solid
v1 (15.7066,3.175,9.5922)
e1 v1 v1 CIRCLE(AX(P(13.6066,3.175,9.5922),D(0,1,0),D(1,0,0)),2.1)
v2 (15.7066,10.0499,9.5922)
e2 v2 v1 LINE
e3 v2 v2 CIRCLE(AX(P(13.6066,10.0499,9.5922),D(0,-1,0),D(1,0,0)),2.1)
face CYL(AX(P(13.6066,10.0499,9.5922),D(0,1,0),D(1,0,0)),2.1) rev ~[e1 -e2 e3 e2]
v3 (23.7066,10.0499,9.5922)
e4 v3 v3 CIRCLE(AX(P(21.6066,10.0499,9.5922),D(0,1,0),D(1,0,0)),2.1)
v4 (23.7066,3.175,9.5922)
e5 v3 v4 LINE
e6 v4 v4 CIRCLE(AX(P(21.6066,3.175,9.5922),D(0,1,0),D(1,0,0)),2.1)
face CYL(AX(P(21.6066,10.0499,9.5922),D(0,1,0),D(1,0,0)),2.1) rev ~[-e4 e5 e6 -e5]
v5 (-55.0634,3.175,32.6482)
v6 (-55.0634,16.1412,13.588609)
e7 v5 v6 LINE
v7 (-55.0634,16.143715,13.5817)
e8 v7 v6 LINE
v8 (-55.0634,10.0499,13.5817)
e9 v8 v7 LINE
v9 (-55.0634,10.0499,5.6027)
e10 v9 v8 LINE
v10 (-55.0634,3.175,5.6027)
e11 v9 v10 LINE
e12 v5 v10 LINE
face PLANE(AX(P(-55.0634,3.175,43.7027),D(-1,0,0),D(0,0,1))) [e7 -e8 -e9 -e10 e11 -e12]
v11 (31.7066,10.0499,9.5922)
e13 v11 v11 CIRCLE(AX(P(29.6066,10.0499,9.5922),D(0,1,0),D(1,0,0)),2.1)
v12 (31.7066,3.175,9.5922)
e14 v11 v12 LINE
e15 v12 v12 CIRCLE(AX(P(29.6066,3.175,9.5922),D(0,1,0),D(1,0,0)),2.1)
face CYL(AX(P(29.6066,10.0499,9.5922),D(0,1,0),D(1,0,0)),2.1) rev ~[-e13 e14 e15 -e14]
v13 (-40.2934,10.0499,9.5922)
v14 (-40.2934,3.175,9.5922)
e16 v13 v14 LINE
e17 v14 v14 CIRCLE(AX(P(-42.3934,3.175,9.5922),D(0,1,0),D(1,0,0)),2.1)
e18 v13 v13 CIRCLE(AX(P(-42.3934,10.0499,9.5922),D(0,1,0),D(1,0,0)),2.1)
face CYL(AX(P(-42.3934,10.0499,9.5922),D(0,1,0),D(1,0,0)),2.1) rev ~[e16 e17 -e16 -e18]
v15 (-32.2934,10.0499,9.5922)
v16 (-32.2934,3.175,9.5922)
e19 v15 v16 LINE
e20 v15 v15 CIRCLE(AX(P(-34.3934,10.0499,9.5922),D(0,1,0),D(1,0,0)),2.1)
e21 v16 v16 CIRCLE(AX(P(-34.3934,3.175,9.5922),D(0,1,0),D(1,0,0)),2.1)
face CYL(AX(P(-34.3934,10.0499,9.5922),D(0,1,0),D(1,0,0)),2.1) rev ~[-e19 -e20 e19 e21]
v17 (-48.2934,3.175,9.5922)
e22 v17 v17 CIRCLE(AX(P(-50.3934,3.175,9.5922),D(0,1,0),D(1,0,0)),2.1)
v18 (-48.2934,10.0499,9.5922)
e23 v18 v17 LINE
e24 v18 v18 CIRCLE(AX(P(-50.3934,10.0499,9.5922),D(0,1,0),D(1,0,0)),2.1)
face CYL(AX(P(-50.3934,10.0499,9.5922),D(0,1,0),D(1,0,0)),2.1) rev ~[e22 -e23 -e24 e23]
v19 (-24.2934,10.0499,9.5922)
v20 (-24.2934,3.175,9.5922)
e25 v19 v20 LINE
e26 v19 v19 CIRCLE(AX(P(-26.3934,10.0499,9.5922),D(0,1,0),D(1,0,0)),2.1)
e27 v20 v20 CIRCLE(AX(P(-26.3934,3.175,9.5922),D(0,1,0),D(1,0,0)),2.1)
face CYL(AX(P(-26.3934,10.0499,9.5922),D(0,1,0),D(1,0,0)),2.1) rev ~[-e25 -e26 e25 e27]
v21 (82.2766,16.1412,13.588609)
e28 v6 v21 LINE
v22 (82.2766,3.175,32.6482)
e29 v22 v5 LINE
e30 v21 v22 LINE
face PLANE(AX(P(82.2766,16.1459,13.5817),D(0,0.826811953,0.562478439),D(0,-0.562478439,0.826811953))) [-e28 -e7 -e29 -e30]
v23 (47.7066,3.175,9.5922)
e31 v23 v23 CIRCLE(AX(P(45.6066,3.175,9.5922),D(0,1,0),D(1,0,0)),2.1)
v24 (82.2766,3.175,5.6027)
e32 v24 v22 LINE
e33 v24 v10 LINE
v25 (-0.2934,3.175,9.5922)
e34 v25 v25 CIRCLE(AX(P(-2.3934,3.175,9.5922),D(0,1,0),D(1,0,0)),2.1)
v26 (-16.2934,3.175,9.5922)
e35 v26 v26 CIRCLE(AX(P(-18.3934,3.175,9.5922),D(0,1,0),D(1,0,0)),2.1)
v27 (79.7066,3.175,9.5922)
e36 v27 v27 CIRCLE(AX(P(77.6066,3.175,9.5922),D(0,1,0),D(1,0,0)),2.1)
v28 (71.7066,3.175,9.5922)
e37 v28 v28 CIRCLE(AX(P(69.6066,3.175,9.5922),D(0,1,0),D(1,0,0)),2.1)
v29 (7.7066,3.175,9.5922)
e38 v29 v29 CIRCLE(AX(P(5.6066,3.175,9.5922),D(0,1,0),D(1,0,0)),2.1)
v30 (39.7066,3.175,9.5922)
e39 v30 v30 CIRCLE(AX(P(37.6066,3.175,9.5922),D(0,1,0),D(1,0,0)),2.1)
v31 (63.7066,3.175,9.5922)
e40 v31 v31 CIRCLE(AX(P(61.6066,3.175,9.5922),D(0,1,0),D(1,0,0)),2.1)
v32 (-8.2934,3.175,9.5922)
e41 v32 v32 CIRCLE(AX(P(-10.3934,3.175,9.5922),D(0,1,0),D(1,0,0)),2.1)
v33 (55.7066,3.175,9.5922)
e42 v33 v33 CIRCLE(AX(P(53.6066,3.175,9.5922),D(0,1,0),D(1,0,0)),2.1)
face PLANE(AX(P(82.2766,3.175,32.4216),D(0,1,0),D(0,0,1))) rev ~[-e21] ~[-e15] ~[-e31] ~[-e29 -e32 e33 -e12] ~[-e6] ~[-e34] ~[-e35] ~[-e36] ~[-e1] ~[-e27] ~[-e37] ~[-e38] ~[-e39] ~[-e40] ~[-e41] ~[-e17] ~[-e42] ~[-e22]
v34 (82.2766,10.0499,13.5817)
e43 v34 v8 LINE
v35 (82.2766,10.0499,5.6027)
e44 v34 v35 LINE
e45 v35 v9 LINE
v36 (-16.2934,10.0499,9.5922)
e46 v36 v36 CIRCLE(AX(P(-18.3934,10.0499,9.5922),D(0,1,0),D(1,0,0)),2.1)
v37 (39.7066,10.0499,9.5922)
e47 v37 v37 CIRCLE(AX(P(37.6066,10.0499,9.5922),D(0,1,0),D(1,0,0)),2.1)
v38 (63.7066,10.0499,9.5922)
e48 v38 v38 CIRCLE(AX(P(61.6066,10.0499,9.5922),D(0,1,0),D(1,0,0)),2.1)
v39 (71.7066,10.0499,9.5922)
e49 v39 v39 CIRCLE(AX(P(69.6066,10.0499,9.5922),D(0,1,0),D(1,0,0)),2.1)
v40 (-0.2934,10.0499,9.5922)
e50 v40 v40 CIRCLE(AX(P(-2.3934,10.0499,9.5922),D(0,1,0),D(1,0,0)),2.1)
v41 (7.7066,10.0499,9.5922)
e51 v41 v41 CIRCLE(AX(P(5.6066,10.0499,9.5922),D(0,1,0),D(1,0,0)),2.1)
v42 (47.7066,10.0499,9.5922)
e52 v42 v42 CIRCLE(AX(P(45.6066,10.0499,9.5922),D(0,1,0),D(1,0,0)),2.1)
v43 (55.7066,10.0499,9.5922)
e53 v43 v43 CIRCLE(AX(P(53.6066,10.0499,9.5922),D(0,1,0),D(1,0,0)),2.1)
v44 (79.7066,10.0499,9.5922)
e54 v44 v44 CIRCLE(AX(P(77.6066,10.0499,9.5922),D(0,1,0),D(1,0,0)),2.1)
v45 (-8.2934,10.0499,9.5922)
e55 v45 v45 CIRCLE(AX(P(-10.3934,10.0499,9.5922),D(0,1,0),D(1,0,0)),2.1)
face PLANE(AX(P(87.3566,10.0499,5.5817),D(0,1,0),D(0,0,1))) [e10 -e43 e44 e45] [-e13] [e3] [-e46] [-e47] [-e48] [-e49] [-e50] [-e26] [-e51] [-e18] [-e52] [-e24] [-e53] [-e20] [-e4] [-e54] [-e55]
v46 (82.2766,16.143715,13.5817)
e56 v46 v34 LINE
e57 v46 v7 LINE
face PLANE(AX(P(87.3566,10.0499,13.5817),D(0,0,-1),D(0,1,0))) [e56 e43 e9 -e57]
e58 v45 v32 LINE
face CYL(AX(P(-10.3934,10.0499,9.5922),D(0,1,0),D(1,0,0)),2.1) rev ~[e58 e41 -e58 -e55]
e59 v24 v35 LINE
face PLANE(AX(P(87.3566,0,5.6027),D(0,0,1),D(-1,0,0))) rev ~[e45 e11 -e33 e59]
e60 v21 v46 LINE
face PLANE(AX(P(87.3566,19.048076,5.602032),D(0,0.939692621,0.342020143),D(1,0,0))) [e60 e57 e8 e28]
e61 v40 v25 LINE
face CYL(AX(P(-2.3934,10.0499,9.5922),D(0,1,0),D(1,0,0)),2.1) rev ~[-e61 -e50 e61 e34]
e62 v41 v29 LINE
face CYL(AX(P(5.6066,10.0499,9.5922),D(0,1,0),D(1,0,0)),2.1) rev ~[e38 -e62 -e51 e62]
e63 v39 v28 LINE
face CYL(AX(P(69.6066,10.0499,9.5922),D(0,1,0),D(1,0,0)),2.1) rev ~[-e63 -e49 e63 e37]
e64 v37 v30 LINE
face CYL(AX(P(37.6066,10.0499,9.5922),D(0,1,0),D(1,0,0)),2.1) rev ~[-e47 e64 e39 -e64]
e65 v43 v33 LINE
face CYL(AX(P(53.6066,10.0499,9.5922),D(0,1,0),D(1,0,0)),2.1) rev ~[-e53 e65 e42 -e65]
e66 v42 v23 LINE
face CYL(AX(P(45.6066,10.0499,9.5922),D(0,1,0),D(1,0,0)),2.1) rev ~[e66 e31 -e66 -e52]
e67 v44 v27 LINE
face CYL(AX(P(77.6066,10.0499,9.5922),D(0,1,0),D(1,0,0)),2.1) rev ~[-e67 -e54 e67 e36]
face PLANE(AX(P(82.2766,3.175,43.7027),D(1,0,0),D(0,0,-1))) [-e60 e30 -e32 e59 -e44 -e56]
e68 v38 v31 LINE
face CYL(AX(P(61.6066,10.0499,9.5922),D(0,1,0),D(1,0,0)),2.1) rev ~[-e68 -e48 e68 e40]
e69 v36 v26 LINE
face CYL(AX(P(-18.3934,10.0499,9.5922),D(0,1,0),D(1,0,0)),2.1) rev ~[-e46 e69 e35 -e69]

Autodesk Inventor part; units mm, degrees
ref_plane "YZ Plane" through (0, 0, 0) normal (1, 0, 0) x (0, 1, 0)
sketch "Sketch1" plane through (0, 0, 0) normal (0, 1, 0) x (-1, 0, 0)
  line L0 (60.1434, 43.7027) -> (-87.3566, 43.7027)
  line L1 (-87.3566, 43.7027) -> (-87.3566, 5.6027)
  line L2 (-87.3566, 5.6027) -> (60.1434, 5.6027)
  line L3 (60.1434, 5.6027) -> (60.1434, 43.7027)
  point P0 (0, 0)
  dimension "d0" = 147.5
  dimension "d1" = 38.1
extrude "Extrusion1" add sketch "Sketch1" along normal blind 19.05
ref_plane "Work Plane1" through (87.3566, 19.05, 5.6027) normal (0, -0.9396926, -0.3420201) x (-1, 0, 0)
sketch "Sketch2" plane through (87.3566, 19.05, 5.6027) normal (0, -0.9396926, -0.3420201) x (-1, 0, 0)
  line L0 (147.5, -42.3178) -> (147.5, -35.8023) construction
  line L1 (0, -35.8023) -> (0, 0) construction
  line L2 (147.5, -40.4915) -> (0, -40.4915)
  line L3 (0, -40.4915) -> (0, 0)
  line L4 (0, 0) -> (147.5, 0)
  line L5 (147.5, 0) -> (147.5, -40.4915)
  point P0 (87.3566, -1.2507)
extrude "Extrusion2" add sketch "Sketch2" against normal blind 19.05
sketch "Sketch3" plane through (87.3566, 36.9511, 12.1182) normal (0, 0.9396926, 0.3420201) x (1, 0, 0)
  line L0 (0, -40.4915) -> (-147.5, -40.4915) construction
  line L1 (0, -6.5155) -> (0, 0) construction
  line L2 (-147.5, -40.4915) -> (0, -40.4915)
  line L3 (0, -40.4915) -> (0, 0)
  line L4 (0, 0) -> (-147.5, 0)
  line L5 (-147.5, 0) -> (-147.5, -40.4915)
  point P0 (-87.3566, -1.2507)
extrude "Extrusion3" cut sketch "Sketch3" against normal blind 19.05
ref_plane "Work Plane2" through (-79.1934, 19.05, 5.6027) normal (0, 1, 0) x (1, 0, 0)
fillet "Fillet2" radius 3.175 5 edges at (13.6066, 5.3397, 43.7027) (13.6066, 0, 43.7027) (-60.1434, 0, 24.6527) (13.6066, 0, 5.6027) (87.3566, 0, 24.6527)
fillet "Fillet3" radius 3.175 1 edges at (13.6066, 19.0479, 5.6027)
sketch "Sketch12" plane through (87.3566, 3.175, 43.7027) normal (1, 0, 0) x (0, 0, -1)
  line L0 (38.121, 6.8749) -> (30.121, 6.8749)
  line L1 (30.121, 6.8749) -> (30.121, 14.8749)
  line L2 (30.121, 14.8749) -> (38.121, 14.8749)
  line L3 (38.121, 14.8749) -> (38.121, 6.8749)
  dimension "d36" = 8
  dimension "d37" = 8
extrude "Extrusion9" cut sketch "Sketch12" against normal through all
sketch "Sketch13" plane through (87.3566, 10.0499, 13.5817) normal (0, 1, 0) x (1, 0, 0)
  line L0 (-73.75, 7.979) -> (-73.75, -0.1527)
  circle A0 centre (-73.75, 3.9895) radius 2.1
  circle A1 centre (-81.75, 3.9895) radius 2.1
  circle A2 centre (-89.75, 3.9895) radius 2.1
  circle A3 centre (-97.75, 3.9895) radius 2.1
  circle A4 centre (-105.75, 3.9895) radius 2.1
  circle A5 centre (-113.75, 3.9895) radius 2.1
  circle A6 centre (-121.75, 3.9895) radius 2.1
  circle A7 centre (-129.75, 3.9895) radius 2.1
  circle A8 centre (-137.75, 3.9895) radius 2.1
  circle A9 centre (-65.75, 3.9895) radius 2.1
  circle A10 centre (-57.75, 3.9895) radius 2.1
  circle A11 centre (-49.75, 3.9895) radius 2.1
  circle A12 centre (-41.75, 3.9895) radius 2.1
  circle A13 centre (-33.75, 3.9895) radius 2.1
  circle A14 centre (-25.75, 3.9895) radius 2.1
  circle A15 centre (-17.75, 3.9895) radius 2.1
  circle A16 centre (-9.75, 3.9895) radius 2.1
extrude "Extrusion10" cut sketch "Sketch13" against normal through all
sketch "Sketch14" plane through (87.3566, 3.175, 43.7027) normal (1, 0, 0) x (0, 0, -1)
  line L0 (-30.4844, 21.6462) -> (52.8728, 21.6462)
  line L1 (52.8728, 21.6462) -> (52.8728, -12.2101)
  line L2 (52.8728, -12.2101) -> (-30.4844, -12.2101)
  line L3 (-30.4844, -12.2101) -> (-30.4844, 21.6462)
  point P0 (43.7027, -3.175)
extrude "Extrusion11" cut sketch "Sketch14" against normal blind 5.08
sketch "Sketch15" plane through (-60.1434, 3.175, 43.7027) normal (-1, 0, 0) x (0, 0, 1)
  line L0 (33.6252, 94.5491) -> (-79.5372, 94.5491)
  line L1 (-79.5372, 94.5491) -> (-79.5372, -54.7848)
  line L2 (-79.5372, -54.7848) -> (33.6252, -54.7848)
  line L3 (33.6252, -54.7848) -> (33.6252, 94.5491)
  point P0 (-43.7027, -3.175)
extrude "Extrusion12" cut sketch "Sketch15" against normal blind 5.08
sketch "Sketch16" plane through (82.2766, 3.175, 43.7027) normal (1, 0, 0) x (0, 0, -1)
  arc A0 (34.925, -3.175) -> (38.1, 0) centre (34.925, 0) ccw construction
  line L0 (-8.1127, -3.175) -> (38.1, -3.175)
  line L1 (38.1, -3.175) -> (38.1, 0)
  line L2 (38.1, 0) -> (-8.1127, 0)
  line L3 (-8.1127, 0) -> (-8.1127, -3.175)
  line L4 (0, 1.4623) -> (0, 0) construction
  line L5 (30.121, 12.9709) -> (11.0545, 0)
  line L6 (11.2811, 0) -> (-2.3132, 0)
  line L7 (-2.3132, 0) -> (0.9299, 12.0527)
  line L8 (0.0505, 2.0261) -> (30.121, 12.9709) construction
  line L9 (0.9299, 12.0527) -> (30.121, 12.9709)
  point P0 (43.7027, -3.175)
  point P1 (0, 0.7312)
extrude "Extrusion14" cut sketch "Sketch16" against normal through all
sketch "Sketch17" plane through (82.2766, 3.175, 43.7027) normal (1, 0, 0) x (0, 0, -1)
  line L0 (30.121, 12.9709) -> (11.0545, 0) construction
  line L1 (11.0545, 0) -> (38.1, 0) construction
  line L2 (38.1, 6.8749) -> (38.1, 0) construction
  line L3 (30.121, 6.8749) -> (38.1, 6.8749) construction
  line L4 (30.121, 12.9709) -> (30.121, 6.8749) construction
  point P0 (43.7027, -3.175)
properties part number "Ramp version 1"
